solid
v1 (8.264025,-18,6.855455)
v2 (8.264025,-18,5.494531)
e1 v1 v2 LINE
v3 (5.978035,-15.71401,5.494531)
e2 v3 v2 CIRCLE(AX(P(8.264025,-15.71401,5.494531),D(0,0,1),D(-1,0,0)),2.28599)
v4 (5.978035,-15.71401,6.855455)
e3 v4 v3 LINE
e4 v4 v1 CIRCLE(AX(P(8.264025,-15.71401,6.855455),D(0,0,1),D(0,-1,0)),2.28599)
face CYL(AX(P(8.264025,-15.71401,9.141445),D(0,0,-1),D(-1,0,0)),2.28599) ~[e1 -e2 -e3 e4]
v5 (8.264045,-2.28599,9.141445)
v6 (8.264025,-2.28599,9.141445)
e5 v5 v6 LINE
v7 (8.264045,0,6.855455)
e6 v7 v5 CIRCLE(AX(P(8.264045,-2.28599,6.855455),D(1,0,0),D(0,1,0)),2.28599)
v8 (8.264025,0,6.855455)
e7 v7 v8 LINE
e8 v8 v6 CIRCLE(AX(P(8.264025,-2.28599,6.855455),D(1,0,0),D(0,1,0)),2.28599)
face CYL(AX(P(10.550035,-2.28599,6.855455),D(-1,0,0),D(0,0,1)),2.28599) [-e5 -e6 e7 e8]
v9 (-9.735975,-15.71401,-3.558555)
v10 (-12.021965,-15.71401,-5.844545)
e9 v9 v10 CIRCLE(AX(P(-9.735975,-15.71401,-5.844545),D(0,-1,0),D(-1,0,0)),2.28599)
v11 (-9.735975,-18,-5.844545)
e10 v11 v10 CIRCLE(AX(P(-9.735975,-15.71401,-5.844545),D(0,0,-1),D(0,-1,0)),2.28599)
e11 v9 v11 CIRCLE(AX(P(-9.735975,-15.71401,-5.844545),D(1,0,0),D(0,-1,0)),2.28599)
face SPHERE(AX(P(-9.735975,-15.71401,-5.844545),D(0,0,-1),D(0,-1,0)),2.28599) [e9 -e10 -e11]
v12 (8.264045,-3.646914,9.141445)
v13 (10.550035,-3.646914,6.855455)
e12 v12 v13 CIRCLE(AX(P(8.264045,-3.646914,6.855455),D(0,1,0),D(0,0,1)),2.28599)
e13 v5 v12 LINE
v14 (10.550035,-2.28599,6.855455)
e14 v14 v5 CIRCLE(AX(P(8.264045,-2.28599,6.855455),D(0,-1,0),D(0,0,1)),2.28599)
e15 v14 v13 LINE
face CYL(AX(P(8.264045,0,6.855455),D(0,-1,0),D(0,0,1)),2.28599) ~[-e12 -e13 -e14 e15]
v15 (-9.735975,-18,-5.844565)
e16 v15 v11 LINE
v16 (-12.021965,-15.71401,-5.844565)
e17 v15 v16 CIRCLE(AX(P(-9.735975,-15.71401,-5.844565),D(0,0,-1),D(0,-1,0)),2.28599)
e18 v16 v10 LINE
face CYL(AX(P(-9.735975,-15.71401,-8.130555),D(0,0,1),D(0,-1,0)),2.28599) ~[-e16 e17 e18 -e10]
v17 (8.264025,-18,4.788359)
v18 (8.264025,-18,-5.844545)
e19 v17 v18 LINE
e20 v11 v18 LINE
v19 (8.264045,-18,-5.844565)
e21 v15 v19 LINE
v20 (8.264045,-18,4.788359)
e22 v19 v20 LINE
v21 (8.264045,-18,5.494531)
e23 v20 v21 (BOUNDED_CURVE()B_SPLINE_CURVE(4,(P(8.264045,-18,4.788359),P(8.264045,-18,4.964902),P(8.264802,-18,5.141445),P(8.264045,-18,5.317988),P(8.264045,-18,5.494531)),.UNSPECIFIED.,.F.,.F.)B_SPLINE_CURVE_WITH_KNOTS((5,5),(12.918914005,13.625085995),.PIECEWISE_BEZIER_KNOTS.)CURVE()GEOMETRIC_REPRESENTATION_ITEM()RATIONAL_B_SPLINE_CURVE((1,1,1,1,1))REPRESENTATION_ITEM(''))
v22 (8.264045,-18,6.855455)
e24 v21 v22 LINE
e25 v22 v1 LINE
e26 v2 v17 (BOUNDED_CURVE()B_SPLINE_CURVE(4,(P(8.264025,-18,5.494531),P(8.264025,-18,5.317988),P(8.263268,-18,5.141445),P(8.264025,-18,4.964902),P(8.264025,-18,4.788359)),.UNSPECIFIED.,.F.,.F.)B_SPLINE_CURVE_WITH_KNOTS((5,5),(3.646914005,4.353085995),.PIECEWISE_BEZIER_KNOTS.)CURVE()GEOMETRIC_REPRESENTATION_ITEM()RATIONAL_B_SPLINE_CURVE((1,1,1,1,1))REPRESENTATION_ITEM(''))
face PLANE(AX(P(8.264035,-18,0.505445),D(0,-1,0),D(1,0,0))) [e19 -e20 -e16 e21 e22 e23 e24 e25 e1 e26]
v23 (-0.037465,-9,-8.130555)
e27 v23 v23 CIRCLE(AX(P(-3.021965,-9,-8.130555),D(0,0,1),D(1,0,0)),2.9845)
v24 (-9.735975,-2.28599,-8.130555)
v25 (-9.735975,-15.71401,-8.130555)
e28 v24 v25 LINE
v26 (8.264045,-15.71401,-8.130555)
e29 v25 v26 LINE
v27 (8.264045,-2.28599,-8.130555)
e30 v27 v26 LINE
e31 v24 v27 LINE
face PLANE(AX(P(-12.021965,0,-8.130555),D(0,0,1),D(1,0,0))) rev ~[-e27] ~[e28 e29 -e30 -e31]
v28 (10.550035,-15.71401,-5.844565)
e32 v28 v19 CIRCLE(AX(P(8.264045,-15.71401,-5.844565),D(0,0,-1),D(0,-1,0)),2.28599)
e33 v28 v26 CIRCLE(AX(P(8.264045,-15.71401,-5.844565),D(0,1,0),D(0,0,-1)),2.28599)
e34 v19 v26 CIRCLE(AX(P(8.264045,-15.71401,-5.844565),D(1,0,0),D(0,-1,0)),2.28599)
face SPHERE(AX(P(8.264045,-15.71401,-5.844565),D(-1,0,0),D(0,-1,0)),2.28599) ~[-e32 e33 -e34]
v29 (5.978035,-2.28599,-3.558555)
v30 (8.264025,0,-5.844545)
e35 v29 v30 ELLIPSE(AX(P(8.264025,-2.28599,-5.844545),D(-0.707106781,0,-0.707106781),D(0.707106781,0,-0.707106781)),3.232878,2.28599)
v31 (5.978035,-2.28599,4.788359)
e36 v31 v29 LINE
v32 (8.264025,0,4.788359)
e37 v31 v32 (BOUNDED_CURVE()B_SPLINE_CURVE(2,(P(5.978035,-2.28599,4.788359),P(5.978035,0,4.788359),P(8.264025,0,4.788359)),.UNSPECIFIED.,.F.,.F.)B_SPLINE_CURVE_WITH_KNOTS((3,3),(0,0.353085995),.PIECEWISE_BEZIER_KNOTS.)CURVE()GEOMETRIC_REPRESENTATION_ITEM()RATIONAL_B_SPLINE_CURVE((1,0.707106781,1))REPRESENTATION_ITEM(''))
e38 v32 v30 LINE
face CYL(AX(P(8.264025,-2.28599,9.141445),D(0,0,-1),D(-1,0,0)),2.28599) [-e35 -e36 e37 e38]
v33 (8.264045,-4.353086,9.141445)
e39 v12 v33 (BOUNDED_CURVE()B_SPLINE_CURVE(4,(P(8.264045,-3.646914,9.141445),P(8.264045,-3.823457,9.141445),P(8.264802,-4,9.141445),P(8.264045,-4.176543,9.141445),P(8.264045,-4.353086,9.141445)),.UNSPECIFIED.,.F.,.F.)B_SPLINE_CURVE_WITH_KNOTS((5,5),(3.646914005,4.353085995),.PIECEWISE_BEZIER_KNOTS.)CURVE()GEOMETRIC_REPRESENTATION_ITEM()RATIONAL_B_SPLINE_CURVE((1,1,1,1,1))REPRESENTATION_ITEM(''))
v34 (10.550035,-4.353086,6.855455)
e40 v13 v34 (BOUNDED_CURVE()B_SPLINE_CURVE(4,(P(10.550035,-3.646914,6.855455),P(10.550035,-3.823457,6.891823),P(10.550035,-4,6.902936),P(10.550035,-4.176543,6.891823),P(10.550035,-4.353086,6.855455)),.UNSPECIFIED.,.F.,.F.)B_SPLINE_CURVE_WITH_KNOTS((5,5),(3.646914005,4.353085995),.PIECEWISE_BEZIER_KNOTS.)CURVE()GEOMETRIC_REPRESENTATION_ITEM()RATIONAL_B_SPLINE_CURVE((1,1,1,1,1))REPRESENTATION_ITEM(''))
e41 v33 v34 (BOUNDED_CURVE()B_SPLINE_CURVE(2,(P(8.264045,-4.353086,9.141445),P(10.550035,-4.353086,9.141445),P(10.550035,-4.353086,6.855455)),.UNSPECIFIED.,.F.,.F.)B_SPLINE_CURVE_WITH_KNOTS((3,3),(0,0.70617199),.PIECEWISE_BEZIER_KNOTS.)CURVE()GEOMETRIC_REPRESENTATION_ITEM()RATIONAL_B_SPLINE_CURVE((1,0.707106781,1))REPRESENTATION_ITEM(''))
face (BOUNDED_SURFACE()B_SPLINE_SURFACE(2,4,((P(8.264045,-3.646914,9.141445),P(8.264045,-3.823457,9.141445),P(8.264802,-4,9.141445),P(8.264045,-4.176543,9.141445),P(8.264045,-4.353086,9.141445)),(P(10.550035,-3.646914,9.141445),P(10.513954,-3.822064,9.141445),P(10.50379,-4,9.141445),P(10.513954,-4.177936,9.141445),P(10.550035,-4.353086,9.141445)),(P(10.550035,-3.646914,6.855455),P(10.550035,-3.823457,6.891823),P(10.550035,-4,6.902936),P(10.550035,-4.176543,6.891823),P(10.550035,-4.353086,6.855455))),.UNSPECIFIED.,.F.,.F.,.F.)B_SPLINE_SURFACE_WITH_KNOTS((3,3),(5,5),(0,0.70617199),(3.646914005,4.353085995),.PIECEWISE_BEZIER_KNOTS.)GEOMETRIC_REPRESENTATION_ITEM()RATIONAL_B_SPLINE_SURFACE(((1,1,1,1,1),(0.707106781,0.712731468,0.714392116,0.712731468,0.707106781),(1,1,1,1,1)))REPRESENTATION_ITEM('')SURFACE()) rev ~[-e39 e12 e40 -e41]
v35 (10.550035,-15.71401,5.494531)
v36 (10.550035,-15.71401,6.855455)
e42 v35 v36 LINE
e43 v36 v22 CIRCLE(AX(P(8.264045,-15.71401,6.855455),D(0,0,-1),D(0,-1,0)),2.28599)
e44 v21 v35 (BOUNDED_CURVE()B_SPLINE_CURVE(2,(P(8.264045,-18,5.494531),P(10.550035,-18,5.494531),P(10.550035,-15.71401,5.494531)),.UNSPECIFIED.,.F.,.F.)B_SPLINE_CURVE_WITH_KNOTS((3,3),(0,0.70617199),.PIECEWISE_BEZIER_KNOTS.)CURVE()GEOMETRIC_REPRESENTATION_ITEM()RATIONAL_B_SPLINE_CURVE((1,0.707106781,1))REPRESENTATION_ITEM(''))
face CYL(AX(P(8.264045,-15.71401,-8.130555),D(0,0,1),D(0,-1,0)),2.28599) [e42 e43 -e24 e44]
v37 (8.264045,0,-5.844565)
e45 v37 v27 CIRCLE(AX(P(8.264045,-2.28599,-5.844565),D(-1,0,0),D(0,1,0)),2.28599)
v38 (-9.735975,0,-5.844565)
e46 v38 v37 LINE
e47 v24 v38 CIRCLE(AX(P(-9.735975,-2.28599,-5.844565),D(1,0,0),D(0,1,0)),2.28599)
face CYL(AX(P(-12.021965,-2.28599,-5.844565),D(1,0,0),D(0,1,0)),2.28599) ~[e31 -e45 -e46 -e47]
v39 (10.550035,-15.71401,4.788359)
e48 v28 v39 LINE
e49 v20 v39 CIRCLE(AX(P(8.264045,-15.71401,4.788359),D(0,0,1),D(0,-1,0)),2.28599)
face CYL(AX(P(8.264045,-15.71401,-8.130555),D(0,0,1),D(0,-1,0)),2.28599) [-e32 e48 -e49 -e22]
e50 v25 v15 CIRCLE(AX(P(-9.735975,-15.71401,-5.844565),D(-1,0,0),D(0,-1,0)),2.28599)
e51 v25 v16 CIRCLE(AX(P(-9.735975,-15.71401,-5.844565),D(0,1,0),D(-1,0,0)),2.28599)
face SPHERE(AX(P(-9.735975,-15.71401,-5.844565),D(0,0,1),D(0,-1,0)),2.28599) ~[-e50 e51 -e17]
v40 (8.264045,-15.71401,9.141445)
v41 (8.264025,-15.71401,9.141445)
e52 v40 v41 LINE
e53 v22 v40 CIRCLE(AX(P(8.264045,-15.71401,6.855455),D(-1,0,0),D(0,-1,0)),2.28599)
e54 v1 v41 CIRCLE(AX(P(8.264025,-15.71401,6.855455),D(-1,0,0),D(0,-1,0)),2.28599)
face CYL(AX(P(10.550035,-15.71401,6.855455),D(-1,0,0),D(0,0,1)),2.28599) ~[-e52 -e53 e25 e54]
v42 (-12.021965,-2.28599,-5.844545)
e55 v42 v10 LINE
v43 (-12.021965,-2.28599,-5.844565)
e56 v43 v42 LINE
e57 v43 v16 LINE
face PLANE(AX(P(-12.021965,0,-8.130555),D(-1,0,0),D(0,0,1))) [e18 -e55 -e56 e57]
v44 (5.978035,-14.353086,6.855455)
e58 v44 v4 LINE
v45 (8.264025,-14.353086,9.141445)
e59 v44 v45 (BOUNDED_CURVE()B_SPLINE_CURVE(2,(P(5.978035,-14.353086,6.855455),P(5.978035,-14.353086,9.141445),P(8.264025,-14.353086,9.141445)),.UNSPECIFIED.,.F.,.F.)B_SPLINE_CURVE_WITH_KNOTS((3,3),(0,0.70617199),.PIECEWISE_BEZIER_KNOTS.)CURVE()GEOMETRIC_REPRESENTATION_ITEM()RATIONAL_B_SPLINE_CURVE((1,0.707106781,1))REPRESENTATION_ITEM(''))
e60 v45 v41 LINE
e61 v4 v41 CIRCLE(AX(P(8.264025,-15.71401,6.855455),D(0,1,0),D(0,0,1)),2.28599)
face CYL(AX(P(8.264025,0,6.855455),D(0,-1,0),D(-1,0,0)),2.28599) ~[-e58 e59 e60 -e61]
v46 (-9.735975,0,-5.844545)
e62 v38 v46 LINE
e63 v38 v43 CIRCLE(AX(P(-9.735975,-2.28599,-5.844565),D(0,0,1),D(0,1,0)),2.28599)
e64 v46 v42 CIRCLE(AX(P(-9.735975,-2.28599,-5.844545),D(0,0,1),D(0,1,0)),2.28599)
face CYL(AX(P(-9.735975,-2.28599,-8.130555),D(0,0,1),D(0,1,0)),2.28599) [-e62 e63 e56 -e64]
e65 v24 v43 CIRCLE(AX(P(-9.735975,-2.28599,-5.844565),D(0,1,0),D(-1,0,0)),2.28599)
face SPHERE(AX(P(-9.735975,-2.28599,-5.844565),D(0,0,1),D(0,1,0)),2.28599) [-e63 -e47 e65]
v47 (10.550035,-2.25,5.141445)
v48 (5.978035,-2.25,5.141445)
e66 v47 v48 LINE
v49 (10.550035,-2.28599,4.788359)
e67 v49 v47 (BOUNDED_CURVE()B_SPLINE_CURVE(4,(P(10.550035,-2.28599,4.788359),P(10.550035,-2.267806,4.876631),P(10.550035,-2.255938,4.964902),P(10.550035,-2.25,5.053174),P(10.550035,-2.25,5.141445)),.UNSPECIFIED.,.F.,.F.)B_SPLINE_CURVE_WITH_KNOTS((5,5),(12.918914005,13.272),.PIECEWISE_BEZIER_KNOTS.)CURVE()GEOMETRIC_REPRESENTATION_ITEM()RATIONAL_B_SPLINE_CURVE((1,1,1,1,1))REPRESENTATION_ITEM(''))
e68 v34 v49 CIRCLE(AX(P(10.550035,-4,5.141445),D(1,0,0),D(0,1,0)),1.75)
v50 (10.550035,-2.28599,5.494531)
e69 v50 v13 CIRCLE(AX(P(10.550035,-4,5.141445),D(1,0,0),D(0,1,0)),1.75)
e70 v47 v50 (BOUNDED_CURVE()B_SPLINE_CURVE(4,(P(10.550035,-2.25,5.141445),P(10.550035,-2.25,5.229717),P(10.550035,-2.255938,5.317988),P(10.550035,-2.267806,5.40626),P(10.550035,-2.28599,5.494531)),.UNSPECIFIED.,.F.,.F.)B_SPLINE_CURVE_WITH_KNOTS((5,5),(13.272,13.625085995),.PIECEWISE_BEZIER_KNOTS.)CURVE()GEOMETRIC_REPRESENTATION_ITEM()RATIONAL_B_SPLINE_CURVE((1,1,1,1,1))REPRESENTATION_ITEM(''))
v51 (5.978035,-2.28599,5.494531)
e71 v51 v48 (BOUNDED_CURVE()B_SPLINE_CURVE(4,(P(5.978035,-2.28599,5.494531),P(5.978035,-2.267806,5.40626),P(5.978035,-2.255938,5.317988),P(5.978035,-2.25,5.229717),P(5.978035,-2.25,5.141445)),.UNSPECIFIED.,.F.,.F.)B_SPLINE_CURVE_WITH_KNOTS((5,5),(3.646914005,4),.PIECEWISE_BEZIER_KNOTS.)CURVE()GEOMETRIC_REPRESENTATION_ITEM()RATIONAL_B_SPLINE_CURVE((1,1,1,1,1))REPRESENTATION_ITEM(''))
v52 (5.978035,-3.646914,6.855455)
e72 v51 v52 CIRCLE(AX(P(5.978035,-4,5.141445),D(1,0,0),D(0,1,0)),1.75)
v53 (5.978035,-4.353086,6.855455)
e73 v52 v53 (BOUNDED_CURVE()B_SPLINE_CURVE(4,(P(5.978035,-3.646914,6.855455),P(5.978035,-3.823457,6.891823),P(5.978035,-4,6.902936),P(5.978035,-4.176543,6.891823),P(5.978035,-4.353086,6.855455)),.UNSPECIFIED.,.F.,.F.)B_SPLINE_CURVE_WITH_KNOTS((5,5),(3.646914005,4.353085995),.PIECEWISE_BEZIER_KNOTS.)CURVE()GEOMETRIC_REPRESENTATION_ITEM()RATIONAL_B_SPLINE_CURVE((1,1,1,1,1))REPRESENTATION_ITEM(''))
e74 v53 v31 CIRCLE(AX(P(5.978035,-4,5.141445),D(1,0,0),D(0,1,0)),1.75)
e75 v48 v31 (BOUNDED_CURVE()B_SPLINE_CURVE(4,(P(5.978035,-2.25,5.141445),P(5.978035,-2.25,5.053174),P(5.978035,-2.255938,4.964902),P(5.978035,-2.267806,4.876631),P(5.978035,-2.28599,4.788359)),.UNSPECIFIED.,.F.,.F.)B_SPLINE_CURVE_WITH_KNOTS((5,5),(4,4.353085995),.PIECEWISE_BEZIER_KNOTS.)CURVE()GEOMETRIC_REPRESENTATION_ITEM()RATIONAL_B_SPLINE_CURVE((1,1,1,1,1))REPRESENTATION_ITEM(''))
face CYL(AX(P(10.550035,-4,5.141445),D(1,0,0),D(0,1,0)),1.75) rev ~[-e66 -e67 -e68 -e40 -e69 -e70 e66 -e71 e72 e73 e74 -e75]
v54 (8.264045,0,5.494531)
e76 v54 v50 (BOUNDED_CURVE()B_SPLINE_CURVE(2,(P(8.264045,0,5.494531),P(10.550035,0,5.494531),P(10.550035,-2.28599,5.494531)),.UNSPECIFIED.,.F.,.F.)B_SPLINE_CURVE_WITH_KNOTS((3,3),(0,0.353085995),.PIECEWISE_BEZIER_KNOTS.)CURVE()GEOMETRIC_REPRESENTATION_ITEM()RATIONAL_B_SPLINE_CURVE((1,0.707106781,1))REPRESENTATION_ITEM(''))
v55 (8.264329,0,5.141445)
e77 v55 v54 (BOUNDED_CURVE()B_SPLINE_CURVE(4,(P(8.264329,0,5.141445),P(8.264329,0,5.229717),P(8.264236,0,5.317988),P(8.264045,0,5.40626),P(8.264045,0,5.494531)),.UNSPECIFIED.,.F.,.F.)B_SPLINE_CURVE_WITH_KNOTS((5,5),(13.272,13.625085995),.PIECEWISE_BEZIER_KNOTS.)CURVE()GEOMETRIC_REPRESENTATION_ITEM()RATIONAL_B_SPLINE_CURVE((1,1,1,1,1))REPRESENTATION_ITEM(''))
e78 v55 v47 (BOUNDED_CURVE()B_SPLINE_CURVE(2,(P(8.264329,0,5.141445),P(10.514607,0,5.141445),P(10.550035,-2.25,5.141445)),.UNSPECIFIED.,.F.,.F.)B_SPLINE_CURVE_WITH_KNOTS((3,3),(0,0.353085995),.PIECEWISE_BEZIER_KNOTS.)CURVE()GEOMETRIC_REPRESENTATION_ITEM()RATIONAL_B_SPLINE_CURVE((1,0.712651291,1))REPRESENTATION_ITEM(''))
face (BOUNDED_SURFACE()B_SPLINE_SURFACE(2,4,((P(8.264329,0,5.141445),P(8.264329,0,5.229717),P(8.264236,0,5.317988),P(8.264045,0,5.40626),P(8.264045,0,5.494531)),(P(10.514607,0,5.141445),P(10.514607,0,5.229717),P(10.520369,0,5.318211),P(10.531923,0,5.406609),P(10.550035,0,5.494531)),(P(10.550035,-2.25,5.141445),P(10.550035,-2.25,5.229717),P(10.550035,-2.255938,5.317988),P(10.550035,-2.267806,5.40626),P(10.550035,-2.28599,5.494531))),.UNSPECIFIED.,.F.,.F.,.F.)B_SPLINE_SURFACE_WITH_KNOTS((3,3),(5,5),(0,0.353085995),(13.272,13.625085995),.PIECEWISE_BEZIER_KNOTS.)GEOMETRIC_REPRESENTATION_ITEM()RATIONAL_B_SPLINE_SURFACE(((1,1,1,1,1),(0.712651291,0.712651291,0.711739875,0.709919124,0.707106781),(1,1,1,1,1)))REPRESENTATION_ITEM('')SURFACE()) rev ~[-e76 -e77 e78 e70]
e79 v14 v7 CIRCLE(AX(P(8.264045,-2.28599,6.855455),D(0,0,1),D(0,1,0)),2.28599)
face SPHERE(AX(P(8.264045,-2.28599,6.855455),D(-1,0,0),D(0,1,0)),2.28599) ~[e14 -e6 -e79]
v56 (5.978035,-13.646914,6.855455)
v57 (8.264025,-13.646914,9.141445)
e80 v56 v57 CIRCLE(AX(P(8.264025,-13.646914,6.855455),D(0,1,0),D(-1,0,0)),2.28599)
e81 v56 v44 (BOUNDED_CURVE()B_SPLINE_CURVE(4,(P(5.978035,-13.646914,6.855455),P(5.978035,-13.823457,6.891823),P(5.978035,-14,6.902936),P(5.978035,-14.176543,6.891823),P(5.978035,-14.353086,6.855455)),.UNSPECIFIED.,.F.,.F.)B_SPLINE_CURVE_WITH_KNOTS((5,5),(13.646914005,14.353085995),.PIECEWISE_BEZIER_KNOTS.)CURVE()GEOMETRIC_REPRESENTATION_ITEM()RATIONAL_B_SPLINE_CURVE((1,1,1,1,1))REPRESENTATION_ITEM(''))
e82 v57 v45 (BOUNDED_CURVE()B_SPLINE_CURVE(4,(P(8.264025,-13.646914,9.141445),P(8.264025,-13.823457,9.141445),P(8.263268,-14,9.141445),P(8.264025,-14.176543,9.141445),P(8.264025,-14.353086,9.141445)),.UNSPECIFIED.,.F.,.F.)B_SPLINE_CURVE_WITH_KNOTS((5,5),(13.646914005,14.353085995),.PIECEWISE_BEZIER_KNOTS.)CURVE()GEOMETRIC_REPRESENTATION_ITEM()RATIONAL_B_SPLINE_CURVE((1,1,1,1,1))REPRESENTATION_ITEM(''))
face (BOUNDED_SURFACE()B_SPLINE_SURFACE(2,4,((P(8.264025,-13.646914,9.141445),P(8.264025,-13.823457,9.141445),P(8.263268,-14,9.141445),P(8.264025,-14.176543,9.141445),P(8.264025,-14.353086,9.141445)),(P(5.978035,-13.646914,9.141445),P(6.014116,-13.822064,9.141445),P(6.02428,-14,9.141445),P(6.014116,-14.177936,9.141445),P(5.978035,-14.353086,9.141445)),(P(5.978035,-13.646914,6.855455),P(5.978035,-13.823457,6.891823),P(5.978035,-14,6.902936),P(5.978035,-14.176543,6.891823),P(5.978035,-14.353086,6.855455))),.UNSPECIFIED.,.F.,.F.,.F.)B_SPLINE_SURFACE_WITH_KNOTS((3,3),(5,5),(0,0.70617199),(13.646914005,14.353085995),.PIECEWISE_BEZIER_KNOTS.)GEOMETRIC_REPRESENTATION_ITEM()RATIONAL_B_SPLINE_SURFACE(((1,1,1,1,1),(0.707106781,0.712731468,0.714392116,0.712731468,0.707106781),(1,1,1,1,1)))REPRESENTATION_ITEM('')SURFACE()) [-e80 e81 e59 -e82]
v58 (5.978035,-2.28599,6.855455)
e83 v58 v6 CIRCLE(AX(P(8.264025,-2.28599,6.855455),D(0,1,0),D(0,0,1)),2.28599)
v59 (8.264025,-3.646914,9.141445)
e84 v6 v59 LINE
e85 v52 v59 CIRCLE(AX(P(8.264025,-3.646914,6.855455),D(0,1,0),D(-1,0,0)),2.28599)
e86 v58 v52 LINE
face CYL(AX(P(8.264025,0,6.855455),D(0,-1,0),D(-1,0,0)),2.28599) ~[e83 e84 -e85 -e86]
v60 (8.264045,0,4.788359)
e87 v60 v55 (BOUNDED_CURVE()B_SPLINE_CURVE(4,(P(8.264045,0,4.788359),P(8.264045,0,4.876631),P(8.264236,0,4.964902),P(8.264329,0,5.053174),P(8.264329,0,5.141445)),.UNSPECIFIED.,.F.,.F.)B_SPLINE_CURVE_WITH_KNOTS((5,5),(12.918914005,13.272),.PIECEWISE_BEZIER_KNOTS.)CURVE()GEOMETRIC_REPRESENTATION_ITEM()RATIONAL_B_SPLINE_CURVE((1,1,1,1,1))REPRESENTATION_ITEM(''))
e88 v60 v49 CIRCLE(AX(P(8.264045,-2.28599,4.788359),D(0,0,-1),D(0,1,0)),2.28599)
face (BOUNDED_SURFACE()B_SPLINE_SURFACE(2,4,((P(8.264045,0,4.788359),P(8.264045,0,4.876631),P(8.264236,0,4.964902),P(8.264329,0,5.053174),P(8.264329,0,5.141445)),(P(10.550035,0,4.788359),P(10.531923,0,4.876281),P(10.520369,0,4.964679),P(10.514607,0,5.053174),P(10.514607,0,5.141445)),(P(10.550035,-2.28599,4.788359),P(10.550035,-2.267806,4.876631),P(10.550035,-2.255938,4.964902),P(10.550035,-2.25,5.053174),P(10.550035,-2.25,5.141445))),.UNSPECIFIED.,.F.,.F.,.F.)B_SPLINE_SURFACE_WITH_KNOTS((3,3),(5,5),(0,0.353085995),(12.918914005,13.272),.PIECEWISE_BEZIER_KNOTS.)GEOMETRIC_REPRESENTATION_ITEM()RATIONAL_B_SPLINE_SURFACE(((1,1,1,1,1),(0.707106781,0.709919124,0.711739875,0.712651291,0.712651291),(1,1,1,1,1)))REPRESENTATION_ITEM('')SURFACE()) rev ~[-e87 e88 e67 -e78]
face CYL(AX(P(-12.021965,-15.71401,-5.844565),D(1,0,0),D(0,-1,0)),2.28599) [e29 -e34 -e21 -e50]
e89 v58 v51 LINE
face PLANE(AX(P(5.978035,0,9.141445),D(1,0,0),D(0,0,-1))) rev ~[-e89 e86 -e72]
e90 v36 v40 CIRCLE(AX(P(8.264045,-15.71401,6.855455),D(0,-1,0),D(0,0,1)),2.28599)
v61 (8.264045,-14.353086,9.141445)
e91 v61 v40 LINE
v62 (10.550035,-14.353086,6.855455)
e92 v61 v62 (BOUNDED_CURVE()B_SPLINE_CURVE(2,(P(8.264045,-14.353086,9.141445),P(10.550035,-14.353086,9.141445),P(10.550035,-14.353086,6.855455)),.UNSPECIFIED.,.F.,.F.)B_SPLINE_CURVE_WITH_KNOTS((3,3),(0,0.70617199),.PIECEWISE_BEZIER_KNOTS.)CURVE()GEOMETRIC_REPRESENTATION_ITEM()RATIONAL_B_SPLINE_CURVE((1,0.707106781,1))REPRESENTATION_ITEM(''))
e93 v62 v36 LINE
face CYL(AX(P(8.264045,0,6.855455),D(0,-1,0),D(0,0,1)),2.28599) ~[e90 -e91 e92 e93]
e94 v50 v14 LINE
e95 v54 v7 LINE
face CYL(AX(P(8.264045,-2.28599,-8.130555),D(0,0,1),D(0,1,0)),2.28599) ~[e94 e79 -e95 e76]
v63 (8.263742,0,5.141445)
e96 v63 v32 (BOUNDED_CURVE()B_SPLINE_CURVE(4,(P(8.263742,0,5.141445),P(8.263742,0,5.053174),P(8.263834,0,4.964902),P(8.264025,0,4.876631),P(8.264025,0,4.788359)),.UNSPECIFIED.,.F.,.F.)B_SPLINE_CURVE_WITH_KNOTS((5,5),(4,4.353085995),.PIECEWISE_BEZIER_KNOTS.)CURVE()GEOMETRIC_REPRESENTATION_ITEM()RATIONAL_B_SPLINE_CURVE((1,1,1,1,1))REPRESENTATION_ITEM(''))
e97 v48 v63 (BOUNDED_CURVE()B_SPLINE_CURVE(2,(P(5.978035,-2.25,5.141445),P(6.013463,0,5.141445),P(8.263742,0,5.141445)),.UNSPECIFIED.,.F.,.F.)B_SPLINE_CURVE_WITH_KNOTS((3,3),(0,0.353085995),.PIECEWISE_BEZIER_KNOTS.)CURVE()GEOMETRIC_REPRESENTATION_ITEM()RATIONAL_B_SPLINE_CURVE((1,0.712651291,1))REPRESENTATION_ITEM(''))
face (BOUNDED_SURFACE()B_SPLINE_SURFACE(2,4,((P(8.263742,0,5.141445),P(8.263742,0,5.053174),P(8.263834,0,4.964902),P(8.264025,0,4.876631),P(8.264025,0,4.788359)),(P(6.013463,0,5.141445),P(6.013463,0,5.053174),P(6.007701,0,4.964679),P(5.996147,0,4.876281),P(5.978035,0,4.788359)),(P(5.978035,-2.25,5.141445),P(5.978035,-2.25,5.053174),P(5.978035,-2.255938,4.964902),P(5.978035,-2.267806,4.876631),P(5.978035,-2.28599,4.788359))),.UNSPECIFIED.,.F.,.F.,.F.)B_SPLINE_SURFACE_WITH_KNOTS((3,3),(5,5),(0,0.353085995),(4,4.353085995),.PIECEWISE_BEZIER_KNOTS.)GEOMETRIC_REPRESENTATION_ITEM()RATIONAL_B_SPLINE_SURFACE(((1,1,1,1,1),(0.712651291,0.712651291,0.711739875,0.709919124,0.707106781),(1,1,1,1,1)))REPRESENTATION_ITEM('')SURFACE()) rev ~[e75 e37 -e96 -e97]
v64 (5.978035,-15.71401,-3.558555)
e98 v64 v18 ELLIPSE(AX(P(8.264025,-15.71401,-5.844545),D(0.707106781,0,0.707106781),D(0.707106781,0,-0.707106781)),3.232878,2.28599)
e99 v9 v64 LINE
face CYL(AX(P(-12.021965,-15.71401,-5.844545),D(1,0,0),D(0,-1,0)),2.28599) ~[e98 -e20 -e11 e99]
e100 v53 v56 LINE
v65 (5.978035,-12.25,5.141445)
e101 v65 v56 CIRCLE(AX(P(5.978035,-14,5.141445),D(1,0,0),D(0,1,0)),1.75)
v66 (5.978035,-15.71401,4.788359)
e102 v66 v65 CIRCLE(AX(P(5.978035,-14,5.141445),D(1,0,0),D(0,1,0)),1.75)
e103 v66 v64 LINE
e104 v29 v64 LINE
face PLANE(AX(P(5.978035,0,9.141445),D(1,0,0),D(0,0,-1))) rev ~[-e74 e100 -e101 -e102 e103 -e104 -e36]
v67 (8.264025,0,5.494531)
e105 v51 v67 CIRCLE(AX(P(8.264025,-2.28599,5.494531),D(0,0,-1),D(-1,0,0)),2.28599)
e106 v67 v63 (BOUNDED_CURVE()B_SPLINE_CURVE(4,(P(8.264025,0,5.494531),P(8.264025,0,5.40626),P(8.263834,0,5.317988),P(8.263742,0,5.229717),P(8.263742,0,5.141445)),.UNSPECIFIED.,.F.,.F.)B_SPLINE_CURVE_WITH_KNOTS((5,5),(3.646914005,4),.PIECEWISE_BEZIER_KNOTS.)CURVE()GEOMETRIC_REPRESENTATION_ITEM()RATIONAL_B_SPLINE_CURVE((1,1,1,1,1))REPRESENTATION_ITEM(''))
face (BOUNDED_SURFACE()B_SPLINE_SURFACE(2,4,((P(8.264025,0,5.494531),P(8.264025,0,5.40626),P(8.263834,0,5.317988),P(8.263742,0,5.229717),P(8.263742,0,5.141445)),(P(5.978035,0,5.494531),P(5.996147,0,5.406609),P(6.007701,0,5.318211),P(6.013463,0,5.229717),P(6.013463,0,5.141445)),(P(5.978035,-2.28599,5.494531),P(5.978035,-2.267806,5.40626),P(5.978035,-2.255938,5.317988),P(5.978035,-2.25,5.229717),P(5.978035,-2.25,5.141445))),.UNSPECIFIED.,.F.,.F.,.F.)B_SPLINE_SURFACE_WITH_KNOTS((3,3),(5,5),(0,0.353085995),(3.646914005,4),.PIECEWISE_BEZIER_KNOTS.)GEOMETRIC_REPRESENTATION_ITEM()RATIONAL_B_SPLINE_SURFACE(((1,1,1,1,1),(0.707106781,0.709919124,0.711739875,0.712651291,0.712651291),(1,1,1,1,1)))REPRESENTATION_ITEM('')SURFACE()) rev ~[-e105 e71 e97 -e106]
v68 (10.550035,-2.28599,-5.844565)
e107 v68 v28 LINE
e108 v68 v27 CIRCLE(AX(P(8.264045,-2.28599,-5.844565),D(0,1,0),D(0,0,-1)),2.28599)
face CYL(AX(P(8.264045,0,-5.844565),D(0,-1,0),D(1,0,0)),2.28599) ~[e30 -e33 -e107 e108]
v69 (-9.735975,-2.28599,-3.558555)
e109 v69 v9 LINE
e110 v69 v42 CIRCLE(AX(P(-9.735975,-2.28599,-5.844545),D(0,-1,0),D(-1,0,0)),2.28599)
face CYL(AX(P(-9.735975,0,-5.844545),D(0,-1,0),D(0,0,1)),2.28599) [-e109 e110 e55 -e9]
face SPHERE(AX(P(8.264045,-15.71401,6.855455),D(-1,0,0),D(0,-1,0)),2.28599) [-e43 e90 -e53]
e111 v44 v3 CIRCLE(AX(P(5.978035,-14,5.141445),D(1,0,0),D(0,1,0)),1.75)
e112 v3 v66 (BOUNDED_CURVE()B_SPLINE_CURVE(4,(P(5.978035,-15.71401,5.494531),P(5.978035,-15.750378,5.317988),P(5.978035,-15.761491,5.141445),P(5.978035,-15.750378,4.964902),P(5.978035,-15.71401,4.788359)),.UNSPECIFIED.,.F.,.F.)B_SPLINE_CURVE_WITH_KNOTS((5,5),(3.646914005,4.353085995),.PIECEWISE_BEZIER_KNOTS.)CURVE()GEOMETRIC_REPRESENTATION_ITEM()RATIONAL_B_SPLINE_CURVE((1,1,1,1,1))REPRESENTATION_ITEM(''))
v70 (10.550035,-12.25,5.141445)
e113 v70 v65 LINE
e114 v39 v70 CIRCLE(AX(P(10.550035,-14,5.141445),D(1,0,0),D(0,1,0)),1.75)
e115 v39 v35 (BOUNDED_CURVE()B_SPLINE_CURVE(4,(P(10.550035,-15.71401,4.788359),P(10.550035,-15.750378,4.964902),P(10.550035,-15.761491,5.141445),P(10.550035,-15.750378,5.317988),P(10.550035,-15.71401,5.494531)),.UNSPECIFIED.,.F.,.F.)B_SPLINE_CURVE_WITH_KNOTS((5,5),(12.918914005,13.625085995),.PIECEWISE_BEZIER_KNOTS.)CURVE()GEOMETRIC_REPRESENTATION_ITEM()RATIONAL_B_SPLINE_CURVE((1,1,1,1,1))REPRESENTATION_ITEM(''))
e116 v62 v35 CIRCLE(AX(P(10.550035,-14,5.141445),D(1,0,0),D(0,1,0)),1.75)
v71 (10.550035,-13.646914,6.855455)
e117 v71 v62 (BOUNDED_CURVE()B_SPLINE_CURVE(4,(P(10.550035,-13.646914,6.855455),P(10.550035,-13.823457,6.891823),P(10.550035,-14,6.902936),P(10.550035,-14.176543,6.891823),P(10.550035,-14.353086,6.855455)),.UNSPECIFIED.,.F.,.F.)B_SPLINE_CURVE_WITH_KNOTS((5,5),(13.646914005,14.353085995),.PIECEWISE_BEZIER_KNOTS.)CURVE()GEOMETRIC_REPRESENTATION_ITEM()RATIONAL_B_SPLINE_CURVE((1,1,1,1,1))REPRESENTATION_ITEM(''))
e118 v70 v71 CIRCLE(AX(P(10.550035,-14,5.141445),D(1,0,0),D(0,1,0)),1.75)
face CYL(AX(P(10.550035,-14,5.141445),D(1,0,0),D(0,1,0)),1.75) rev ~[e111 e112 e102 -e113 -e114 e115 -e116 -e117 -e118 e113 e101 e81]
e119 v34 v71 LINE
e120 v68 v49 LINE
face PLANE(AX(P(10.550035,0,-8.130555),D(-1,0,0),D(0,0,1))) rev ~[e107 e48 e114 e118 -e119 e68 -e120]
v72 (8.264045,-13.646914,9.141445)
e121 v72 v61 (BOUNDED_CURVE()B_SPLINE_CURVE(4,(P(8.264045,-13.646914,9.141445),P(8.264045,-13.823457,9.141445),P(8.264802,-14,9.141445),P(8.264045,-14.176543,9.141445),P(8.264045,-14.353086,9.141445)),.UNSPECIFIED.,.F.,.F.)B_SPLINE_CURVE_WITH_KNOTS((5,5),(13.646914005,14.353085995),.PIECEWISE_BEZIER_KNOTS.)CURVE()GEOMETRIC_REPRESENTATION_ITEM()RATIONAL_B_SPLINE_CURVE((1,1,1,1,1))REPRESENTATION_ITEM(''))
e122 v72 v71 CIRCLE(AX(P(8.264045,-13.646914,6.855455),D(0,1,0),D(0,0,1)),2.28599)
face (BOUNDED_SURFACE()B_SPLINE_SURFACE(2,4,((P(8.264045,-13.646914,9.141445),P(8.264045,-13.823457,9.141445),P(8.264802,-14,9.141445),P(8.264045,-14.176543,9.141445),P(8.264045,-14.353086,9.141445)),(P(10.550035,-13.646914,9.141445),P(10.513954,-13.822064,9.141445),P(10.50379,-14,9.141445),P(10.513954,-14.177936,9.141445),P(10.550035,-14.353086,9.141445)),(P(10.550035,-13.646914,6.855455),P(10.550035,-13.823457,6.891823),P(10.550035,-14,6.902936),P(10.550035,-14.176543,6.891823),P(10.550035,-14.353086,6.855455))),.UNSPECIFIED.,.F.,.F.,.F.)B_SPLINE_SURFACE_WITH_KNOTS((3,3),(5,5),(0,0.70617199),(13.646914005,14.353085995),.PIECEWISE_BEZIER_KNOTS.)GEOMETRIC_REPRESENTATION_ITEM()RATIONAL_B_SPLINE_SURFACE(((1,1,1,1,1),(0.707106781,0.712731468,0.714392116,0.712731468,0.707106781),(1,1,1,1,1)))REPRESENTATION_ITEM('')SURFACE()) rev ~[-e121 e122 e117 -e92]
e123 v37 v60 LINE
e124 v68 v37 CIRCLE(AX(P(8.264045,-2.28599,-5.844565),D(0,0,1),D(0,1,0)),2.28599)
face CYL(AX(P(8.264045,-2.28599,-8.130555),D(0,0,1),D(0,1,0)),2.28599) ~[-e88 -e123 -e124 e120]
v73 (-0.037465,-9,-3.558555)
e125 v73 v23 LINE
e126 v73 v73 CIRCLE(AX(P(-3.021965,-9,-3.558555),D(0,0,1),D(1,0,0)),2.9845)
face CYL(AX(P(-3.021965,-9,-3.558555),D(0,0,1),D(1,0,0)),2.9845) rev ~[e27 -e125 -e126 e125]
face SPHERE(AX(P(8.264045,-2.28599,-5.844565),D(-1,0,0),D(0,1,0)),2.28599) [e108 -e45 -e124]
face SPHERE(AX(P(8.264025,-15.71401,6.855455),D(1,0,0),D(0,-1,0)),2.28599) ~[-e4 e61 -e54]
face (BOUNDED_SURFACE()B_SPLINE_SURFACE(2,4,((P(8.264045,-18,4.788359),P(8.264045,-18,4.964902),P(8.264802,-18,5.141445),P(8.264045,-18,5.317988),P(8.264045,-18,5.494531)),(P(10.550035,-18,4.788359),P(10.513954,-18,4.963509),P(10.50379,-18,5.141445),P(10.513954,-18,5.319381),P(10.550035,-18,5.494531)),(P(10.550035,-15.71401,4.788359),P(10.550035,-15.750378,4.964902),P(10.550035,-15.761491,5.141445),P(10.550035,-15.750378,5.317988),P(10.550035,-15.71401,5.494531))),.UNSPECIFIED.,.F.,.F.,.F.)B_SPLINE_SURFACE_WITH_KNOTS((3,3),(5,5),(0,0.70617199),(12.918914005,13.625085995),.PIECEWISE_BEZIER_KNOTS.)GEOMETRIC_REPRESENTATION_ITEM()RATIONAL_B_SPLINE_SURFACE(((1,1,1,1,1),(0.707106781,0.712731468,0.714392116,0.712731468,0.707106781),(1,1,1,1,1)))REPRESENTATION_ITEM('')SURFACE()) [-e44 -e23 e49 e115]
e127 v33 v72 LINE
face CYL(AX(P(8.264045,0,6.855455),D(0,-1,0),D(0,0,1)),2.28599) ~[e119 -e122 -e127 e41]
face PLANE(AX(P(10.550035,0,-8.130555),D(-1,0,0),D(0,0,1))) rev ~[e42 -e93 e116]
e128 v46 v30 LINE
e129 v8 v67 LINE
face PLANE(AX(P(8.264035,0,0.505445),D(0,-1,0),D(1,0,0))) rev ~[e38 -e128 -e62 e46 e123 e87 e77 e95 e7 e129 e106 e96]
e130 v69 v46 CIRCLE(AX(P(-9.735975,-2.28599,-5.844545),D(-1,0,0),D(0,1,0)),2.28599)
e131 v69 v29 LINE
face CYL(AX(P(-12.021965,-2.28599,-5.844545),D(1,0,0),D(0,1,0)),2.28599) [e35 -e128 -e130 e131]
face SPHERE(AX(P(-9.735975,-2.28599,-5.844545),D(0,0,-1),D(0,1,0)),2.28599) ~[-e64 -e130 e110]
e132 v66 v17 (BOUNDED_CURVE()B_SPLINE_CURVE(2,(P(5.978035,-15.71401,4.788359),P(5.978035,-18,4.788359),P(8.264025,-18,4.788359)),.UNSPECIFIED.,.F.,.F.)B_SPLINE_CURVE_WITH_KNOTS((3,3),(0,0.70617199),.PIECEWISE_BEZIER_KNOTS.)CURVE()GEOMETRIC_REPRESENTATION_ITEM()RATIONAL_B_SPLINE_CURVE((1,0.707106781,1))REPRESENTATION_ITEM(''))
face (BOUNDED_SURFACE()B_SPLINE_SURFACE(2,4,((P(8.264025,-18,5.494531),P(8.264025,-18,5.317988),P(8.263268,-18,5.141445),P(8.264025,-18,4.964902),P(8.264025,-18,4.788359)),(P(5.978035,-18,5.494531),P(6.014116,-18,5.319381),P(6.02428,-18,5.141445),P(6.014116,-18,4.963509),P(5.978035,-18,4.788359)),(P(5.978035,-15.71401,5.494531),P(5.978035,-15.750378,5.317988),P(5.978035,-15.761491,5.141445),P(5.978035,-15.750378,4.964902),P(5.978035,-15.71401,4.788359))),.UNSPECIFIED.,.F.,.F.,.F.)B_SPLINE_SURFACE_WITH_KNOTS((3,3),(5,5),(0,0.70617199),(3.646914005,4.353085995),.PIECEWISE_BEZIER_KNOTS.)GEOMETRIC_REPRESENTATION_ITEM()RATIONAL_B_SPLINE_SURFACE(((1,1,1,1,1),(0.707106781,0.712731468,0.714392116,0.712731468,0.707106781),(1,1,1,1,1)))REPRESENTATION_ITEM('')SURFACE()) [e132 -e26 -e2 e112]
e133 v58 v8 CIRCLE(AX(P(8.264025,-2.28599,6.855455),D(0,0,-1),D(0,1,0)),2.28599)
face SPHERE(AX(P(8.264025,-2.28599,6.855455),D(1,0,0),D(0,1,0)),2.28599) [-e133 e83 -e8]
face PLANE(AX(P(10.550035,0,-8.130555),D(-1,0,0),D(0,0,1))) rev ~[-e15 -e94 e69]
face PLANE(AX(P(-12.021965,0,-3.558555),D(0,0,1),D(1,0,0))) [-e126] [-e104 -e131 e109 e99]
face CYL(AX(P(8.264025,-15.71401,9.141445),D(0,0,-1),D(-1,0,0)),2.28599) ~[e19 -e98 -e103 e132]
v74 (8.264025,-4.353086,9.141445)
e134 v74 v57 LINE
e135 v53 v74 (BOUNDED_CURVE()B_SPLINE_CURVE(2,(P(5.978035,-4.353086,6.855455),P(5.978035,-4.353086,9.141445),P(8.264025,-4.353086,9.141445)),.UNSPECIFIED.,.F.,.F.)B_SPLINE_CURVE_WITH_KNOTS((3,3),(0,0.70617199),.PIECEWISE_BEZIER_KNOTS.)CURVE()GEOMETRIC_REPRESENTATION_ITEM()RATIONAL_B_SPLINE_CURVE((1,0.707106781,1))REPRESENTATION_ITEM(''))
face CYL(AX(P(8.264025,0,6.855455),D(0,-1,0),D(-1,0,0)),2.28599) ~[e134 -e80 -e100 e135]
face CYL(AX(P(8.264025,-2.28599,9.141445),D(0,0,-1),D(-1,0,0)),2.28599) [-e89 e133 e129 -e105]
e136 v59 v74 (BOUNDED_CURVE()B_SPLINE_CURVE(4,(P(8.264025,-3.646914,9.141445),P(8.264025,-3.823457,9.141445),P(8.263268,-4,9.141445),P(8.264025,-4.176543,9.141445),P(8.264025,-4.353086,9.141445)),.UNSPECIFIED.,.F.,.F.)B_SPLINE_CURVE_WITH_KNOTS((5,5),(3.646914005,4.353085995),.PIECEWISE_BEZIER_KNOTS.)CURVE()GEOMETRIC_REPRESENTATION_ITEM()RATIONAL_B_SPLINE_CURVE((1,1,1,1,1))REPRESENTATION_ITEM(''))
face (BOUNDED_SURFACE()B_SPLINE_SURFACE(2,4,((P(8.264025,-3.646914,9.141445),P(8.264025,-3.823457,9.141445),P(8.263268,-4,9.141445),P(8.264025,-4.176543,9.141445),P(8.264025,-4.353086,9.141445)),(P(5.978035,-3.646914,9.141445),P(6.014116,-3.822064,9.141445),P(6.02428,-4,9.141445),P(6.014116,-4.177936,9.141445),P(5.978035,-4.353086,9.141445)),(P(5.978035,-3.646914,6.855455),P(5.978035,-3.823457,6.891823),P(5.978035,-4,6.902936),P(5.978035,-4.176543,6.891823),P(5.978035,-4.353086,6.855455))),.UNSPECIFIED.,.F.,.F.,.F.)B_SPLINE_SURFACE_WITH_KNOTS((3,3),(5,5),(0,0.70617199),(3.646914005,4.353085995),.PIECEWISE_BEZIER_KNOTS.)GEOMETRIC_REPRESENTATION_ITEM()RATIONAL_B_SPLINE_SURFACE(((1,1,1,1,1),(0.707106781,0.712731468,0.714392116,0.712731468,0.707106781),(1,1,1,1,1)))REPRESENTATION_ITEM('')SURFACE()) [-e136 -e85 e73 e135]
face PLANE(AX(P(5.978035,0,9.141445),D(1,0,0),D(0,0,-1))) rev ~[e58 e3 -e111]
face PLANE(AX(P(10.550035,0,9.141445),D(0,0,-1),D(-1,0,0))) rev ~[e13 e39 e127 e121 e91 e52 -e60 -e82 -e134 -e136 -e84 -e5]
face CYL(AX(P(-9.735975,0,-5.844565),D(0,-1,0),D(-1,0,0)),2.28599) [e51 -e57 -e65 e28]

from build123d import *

# Parameters (mm, degrees)
F0_W     = 18
F0_H     = 4.572
F1_DEPTH = 18
F2_R     = 2.9845
F3_DEPTH = 25.4
F4_R     = 1.75
F5_DEPTH = 25.4
F6_R     = 2.28599


# Not quite as in the source:
# - a fillet or chamfer is up to 0.001 mm smaller than in the source, because OpenCascade refuses the exact size


with BuildPart() as f1:
    # F0 (on Front) → F1 (new body)
    with BuildSketch(Plane.XZ):
        Polygon((5.9780351967, 9.1414450236), (5.9780351967, -3.5585549764), (5.9780351967, -8.1305549764), (10.5500351967, -8.1305549764), (10.5500351967, 9.1414450236), align=None)
        with Locations((-3.0219648033, -5.8445549764)):
            Rectangle(F0_W, F0_H)
    extrude(amount=F1_DEPTH)

    # F2 (on face) → F3 (cut)
    with BuildSketch(Plane.XY.offset(-3.5585549764)):
        with Locations((-3.0219648033, -9)):
            Circle(F2_R)
    extrude(amount=-F3_DEPTH, mode=Mode.SUBTRACT)

    # F4 (on face) → F5 (cut)
    with BuildSketch(Plane.YZ.offset(10.5500351967)):
        with Locations((-14, 5.1414450236)):
            Circle(F4_R)
        with Locations((-4, 5.1414450236)):
            Circle(F4_R)
    extrude(amount=-F5_DEPTH, mode=Mode.SUBTRACT)

    # F6 (radius 2.286 in the source; OpenCascade refuses exactly that, so slightly less here)
    f6_edges = [f1.edges().sort_by_distance(p)[0] for p in [
        (8.264035, -18, 9.141445),
        (8.264035, 0, 9.141445),
        (-12.021965, -18, -5.844555),
        (-12.021965, 0, -5.844555),
        (5.978035, -18, 2.791445),
        (-3.021965, -18, -3.558555),
        (-0.735965, -18, -8.130555),
        (10.550035, -18, 0.505445),
        (5.978035, 0, 2.791445),
        (-3.021965, 0, -3.558555),
        (-0.735965, 0, -8.130555),
        (10.550035, 0, 0.505445),
        (-12.021965, -9, -3.558555),
        (-12.021965, -9, -8.130555),
        (10.550035, -9, -8.130555),
        (10.550035, -9, 9.141445),
        (5.978035, -9, 9.141445),
    ]]
    fillet(f6_edges, radius=F6_R)


solid = f1.part
